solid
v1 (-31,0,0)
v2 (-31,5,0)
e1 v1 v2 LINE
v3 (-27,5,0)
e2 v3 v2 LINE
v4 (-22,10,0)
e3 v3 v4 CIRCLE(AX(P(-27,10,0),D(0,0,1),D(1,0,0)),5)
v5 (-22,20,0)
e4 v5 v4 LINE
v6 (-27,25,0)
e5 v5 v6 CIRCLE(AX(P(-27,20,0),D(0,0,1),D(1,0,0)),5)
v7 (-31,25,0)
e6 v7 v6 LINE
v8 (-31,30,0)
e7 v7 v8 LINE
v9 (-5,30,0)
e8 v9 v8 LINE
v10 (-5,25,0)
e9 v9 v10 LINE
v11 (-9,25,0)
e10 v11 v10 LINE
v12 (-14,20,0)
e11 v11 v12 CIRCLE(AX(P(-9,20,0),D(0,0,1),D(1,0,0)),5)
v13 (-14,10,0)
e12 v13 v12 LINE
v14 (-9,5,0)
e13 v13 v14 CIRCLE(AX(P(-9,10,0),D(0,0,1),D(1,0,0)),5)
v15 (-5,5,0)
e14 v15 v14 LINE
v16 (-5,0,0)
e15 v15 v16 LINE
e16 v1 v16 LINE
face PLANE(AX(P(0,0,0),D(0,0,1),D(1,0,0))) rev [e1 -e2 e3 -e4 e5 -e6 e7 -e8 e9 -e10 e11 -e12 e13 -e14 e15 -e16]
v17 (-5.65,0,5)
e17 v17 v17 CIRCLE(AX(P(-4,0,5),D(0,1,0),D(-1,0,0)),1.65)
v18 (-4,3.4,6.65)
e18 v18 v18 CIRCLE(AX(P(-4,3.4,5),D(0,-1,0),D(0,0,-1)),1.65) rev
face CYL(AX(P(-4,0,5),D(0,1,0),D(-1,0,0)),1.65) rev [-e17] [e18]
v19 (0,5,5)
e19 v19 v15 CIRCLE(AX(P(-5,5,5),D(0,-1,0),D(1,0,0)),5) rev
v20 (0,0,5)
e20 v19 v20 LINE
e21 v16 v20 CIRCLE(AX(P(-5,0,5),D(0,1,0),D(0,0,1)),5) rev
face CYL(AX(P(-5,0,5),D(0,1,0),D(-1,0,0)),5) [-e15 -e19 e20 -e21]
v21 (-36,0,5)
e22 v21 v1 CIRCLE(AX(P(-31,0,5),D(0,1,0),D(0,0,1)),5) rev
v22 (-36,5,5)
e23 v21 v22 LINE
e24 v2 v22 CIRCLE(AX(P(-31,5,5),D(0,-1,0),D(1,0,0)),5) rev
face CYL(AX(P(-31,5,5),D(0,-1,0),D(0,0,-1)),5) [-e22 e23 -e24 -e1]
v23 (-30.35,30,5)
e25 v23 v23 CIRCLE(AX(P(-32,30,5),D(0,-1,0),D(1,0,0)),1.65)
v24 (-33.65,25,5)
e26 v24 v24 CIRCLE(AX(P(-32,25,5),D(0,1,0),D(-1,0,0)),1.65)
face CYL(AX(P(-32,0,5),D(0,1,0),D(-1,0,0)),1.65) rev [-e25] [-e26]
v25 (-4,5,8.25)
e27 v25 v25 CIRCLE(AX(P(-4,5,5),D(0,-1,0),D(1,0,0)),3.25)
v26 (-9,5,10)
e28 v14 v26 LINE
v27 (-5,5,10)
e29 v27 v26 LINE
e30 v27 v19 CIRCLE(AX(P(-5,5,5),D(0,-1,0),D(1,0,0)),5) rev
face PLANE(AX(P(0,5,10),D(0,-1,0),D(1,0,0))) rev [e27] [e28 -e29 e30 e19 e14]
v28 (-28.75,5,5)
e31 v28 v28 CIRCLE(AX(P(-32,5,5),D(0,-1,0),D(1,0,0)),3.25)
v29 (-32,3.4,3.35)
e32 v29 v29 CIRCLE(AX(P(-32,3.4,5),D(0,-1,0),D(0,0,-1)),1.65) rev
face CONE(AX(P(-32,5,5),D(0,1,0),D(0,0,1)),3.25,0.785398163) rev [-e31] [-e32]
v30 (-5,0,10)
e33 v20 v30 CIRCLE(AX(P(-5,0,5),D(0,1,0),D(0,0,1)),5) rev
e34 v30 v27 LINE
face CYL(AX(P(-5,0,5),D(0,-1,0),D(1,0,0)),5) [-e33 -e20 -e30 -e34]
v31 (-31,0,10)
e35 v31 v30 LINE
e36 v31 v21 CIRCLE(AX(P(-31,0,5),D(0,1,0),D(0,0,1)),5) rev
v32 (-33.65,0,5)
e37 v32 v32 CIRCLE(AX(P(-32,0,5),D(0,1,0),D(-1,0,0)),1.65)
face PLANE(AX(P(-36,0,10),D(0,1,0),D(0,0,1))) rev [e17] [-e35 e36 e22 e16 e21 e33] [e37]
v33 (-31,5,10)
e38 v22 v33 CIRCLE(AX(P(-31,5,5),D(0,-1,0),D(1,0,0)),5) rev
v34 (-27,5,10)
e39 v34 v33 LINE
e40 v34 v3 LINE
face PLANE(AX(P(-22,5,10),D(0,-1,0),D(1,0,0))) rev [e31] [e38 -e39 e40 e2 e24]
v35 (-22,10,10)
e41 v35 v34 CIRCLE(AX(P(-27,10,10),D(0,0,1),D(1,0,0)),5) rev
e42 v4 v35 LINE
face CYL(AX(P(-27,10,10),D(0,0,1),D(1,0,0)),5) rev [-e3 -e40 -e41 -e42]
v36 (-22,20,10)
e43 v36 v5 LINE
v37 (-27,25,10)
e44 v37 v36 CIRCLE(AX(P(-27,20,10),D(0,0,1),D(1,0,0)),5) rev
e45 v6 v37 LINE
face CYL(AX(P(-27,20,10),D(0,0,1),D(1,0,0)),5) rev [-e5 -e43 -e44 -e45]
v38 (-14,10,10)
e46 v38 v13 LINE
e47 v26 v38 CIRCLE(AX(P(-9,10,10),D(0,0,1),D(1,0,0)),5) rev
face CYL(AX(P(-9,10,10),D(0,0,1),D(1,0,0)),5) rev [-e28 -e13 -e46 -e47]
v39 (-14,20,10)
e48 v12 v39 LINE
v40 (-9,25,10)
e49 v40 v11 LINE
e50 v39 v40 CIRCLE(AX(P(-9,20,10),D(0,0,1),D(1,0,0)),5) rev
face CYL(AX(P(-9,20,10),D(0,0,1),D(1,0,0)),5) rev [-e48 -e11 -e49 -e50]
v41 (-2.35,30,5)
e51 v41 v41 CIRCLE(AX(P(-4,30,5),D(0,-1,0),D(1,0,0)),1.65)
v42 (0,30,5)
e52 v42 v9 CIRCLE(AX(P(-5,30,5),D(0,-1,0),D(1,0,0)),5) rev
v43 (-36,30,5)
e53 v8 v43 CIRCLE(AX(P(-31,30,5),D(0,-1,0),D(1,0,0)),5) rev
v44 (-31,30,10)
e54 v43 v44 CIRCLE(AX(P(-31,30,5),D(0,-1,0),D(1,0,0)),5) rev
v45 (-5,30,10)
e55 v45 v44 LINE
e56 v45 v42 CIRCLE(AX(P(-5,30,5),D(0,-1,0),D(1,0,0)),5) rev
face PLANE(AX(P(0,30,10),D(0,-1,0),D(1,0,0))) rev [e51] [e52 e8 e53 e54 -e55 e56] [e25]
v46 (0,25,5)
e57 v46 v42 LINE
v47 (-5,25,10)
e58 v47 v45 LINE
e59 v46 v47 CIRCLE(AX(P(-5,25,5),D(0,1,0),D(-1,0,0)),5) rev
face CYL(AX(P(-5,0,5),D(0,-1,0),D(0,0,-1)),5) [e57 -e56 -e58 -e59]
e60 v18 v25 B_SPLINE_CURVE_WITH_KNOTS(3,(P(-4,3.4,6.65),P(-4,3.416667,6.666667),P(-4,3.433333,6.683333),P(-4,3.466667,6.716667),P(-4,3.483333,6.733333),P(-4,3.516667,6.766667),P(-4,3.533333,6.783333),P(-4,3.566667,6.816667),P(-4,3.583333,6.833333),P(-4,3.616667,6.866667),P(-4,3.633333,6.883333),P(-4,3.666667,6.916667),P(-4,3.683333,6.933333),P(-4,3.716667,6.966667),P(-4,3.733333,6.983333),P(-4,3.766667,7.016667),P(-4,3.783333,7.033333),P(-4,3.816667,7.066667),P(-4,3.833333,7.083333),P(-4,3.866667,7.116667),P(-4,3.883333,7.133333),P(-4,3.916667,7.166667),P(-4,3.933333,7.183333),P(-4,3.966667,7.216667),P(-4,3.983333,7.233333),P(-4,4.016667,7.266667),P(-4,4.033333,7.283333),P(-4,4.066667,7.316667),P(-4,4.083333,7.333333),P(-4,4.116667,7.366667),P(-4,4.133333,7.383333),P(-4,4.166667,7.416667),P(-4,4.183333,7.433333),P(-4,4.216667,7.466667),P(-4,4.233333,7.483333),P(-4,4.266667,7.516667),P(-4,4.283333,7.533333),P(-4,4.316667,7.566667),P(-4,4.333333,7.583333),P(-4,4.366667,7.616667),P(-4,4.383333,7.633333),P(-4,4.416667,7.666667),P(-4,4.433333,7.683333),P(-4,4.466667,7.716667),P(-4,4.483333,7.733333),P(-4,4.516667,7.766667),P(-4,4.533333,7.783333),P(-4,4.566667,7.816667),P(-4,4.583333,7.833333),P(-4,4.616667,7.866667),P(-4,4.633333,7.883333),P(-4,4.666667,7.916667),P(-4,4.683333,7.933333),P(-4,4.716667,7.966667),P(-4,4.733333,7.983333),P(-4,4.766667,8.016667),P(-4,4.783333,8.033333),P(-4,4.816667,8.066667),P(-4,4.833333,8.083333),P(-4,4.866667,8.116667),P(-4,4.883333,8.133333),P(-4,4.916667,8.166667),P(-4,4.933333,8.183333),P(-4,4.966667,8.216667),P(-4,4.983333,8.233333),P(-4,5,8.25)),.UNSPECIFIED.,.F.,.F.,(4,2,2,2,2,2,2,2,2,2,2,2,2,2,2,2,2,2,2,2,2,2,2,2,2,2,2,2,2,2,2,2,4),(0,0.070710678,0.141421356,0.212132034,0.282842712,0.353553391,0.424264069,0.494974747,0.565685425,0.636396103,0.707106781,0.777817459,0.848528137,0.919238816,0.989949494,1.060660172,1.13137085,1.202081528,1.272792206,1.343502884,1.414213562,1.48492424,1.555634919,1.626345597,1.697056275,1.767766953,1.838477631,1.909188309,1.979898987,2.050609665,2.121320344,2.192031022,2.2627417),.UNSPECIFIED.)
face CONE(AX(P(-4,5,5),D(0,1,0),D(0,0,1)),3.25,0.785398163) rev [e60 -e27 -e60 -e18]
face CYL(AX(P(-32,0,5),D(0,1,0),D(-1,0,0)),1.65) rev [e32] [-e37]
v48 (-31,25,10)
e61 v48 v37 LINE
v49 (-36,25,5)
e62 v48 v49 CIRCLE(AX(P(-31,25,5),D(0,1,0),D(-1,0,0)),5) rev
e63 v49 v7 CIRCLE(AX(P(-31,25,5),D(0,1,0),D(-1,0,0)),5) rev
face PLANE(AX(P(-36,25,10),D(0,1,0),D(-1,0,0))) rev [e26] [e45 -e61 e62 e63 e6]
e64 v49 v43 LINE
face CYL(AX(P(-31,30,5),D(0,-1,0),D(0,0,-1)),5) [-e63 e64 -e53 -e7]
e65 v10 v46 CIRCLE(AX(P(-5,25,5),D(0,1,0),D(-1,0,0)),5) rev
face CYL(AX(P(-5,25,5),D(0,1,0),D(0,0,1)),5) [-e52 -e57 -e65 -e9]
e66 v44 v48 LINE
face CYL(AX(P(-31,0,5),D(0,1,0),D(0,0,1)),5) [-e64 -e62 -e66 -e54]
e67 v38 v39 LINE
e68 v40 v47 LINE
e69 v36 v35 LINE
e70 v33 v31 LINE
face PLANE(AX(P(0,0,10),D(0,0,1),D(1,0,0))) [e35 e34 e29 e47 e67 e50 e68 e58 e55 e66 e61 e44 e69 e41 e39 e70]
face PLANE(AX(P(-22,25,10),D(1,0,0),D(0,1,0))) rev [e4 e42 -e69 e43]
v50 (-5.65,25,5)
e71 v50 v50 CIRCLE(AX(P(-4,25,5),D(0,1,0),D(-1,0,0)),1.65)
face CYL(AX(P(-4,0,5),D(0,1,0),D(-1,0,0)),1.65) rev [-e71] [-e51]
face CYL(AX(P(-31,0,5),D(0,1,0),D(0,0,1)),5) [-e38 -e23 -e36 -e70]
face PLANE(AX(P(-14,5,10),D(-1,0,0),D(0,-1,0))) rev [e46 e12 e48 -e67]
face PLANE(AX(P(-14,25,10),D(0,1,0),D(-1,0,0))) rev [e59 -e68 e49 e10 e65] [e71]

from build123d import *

# Parameters (mm, degrees)
BOSS_EXTRUDE1_DEPTH     = 10
CUT_EXTRUDE1_DEPTH      = 48.916594203
CUT_EXTRUDE1_DEPTH_BACK = 48.916594203
SKETCH2_R               = 1.65
CHAMFER1_SIZE           = 1.6
FILLET1_R               = 5
FILLET2_R               = 5


with BuildPart() as part:
    # Sketch1 → Boss-Extrude1 (new body)
    with BuildSketch(Plane.XY):
        Polygon((0, 0), (0, 5), (-14, 5), (-14, 25), (0, 25), (0, 30), (-36, 30), (-36, 25), (-22, 25), (-22, 5), (-36, 5), (-36, 0), align=None)
    extrude(amount=BOSS_EXTRUDE1_DEPTH)

    # Sketch2 → Cut-Extrude1 (cut, two sides: drawn at the far end of the back side and taken through both)
    with BuildSketch(Plane(origin=(0, 30, 0), x_dir=(1, 0, 0), z_dir=(0, 1, 0)).offset(-CUT_EXTRUDE1_DEPTH_BACK)):
        with Locations(Location((-32, -5, 0), (0, 0, 180))):
            Circle(SKETCH2_R)
        with Locations(Location((-4, -5, 0), (0, 0, 180))):
            Circle(SKETCH2_R)
    extrude(amount=CUT_EXTRUDE1_DEPTH + CUT_EXTRUDE1_DEPTH_BACK, mode=Mode.SUBTRACT)

    # Chamfer1
    chamfer1_edges = [part.edges().sort_by_distance(p)[0] for p in [
        (-30.35, 5, 5),
        (-2.35, 5, 5),
    ]]
    chamfer(chamfer1_edges, length=CHAMFER1_SIZE)

    # Fillet1
    fillet1_edges = [part.edges().sort_by_distance(p)[0] for p in [
        (-22, 5, 5),
        (-22, 25, 5),
        (-14, 25, 5),
        (-14, 5, 5),
    ]]
    fillet(fillet1_edges, radius=FILLET1_R)

    # Fillet2
    fillet2_edges = [part.edges().sort_by_distance(p)[0] for p in [
        (0, 27.5, 10),
        (0, 27.5, 0),
        (0, 2.5, 0),
        (0, 2.5, 10),
        (-36, 2.5, 0),
        (-36, 2.5, 10),
        (-36, 27.5, 0),
        (-36, 27.5, 10),
    ]]
    fillet(fillet2_edges, radius=FILLET2_R - 0.0001)  # a hair under: the kernel refuses the full size


solid = part.part
